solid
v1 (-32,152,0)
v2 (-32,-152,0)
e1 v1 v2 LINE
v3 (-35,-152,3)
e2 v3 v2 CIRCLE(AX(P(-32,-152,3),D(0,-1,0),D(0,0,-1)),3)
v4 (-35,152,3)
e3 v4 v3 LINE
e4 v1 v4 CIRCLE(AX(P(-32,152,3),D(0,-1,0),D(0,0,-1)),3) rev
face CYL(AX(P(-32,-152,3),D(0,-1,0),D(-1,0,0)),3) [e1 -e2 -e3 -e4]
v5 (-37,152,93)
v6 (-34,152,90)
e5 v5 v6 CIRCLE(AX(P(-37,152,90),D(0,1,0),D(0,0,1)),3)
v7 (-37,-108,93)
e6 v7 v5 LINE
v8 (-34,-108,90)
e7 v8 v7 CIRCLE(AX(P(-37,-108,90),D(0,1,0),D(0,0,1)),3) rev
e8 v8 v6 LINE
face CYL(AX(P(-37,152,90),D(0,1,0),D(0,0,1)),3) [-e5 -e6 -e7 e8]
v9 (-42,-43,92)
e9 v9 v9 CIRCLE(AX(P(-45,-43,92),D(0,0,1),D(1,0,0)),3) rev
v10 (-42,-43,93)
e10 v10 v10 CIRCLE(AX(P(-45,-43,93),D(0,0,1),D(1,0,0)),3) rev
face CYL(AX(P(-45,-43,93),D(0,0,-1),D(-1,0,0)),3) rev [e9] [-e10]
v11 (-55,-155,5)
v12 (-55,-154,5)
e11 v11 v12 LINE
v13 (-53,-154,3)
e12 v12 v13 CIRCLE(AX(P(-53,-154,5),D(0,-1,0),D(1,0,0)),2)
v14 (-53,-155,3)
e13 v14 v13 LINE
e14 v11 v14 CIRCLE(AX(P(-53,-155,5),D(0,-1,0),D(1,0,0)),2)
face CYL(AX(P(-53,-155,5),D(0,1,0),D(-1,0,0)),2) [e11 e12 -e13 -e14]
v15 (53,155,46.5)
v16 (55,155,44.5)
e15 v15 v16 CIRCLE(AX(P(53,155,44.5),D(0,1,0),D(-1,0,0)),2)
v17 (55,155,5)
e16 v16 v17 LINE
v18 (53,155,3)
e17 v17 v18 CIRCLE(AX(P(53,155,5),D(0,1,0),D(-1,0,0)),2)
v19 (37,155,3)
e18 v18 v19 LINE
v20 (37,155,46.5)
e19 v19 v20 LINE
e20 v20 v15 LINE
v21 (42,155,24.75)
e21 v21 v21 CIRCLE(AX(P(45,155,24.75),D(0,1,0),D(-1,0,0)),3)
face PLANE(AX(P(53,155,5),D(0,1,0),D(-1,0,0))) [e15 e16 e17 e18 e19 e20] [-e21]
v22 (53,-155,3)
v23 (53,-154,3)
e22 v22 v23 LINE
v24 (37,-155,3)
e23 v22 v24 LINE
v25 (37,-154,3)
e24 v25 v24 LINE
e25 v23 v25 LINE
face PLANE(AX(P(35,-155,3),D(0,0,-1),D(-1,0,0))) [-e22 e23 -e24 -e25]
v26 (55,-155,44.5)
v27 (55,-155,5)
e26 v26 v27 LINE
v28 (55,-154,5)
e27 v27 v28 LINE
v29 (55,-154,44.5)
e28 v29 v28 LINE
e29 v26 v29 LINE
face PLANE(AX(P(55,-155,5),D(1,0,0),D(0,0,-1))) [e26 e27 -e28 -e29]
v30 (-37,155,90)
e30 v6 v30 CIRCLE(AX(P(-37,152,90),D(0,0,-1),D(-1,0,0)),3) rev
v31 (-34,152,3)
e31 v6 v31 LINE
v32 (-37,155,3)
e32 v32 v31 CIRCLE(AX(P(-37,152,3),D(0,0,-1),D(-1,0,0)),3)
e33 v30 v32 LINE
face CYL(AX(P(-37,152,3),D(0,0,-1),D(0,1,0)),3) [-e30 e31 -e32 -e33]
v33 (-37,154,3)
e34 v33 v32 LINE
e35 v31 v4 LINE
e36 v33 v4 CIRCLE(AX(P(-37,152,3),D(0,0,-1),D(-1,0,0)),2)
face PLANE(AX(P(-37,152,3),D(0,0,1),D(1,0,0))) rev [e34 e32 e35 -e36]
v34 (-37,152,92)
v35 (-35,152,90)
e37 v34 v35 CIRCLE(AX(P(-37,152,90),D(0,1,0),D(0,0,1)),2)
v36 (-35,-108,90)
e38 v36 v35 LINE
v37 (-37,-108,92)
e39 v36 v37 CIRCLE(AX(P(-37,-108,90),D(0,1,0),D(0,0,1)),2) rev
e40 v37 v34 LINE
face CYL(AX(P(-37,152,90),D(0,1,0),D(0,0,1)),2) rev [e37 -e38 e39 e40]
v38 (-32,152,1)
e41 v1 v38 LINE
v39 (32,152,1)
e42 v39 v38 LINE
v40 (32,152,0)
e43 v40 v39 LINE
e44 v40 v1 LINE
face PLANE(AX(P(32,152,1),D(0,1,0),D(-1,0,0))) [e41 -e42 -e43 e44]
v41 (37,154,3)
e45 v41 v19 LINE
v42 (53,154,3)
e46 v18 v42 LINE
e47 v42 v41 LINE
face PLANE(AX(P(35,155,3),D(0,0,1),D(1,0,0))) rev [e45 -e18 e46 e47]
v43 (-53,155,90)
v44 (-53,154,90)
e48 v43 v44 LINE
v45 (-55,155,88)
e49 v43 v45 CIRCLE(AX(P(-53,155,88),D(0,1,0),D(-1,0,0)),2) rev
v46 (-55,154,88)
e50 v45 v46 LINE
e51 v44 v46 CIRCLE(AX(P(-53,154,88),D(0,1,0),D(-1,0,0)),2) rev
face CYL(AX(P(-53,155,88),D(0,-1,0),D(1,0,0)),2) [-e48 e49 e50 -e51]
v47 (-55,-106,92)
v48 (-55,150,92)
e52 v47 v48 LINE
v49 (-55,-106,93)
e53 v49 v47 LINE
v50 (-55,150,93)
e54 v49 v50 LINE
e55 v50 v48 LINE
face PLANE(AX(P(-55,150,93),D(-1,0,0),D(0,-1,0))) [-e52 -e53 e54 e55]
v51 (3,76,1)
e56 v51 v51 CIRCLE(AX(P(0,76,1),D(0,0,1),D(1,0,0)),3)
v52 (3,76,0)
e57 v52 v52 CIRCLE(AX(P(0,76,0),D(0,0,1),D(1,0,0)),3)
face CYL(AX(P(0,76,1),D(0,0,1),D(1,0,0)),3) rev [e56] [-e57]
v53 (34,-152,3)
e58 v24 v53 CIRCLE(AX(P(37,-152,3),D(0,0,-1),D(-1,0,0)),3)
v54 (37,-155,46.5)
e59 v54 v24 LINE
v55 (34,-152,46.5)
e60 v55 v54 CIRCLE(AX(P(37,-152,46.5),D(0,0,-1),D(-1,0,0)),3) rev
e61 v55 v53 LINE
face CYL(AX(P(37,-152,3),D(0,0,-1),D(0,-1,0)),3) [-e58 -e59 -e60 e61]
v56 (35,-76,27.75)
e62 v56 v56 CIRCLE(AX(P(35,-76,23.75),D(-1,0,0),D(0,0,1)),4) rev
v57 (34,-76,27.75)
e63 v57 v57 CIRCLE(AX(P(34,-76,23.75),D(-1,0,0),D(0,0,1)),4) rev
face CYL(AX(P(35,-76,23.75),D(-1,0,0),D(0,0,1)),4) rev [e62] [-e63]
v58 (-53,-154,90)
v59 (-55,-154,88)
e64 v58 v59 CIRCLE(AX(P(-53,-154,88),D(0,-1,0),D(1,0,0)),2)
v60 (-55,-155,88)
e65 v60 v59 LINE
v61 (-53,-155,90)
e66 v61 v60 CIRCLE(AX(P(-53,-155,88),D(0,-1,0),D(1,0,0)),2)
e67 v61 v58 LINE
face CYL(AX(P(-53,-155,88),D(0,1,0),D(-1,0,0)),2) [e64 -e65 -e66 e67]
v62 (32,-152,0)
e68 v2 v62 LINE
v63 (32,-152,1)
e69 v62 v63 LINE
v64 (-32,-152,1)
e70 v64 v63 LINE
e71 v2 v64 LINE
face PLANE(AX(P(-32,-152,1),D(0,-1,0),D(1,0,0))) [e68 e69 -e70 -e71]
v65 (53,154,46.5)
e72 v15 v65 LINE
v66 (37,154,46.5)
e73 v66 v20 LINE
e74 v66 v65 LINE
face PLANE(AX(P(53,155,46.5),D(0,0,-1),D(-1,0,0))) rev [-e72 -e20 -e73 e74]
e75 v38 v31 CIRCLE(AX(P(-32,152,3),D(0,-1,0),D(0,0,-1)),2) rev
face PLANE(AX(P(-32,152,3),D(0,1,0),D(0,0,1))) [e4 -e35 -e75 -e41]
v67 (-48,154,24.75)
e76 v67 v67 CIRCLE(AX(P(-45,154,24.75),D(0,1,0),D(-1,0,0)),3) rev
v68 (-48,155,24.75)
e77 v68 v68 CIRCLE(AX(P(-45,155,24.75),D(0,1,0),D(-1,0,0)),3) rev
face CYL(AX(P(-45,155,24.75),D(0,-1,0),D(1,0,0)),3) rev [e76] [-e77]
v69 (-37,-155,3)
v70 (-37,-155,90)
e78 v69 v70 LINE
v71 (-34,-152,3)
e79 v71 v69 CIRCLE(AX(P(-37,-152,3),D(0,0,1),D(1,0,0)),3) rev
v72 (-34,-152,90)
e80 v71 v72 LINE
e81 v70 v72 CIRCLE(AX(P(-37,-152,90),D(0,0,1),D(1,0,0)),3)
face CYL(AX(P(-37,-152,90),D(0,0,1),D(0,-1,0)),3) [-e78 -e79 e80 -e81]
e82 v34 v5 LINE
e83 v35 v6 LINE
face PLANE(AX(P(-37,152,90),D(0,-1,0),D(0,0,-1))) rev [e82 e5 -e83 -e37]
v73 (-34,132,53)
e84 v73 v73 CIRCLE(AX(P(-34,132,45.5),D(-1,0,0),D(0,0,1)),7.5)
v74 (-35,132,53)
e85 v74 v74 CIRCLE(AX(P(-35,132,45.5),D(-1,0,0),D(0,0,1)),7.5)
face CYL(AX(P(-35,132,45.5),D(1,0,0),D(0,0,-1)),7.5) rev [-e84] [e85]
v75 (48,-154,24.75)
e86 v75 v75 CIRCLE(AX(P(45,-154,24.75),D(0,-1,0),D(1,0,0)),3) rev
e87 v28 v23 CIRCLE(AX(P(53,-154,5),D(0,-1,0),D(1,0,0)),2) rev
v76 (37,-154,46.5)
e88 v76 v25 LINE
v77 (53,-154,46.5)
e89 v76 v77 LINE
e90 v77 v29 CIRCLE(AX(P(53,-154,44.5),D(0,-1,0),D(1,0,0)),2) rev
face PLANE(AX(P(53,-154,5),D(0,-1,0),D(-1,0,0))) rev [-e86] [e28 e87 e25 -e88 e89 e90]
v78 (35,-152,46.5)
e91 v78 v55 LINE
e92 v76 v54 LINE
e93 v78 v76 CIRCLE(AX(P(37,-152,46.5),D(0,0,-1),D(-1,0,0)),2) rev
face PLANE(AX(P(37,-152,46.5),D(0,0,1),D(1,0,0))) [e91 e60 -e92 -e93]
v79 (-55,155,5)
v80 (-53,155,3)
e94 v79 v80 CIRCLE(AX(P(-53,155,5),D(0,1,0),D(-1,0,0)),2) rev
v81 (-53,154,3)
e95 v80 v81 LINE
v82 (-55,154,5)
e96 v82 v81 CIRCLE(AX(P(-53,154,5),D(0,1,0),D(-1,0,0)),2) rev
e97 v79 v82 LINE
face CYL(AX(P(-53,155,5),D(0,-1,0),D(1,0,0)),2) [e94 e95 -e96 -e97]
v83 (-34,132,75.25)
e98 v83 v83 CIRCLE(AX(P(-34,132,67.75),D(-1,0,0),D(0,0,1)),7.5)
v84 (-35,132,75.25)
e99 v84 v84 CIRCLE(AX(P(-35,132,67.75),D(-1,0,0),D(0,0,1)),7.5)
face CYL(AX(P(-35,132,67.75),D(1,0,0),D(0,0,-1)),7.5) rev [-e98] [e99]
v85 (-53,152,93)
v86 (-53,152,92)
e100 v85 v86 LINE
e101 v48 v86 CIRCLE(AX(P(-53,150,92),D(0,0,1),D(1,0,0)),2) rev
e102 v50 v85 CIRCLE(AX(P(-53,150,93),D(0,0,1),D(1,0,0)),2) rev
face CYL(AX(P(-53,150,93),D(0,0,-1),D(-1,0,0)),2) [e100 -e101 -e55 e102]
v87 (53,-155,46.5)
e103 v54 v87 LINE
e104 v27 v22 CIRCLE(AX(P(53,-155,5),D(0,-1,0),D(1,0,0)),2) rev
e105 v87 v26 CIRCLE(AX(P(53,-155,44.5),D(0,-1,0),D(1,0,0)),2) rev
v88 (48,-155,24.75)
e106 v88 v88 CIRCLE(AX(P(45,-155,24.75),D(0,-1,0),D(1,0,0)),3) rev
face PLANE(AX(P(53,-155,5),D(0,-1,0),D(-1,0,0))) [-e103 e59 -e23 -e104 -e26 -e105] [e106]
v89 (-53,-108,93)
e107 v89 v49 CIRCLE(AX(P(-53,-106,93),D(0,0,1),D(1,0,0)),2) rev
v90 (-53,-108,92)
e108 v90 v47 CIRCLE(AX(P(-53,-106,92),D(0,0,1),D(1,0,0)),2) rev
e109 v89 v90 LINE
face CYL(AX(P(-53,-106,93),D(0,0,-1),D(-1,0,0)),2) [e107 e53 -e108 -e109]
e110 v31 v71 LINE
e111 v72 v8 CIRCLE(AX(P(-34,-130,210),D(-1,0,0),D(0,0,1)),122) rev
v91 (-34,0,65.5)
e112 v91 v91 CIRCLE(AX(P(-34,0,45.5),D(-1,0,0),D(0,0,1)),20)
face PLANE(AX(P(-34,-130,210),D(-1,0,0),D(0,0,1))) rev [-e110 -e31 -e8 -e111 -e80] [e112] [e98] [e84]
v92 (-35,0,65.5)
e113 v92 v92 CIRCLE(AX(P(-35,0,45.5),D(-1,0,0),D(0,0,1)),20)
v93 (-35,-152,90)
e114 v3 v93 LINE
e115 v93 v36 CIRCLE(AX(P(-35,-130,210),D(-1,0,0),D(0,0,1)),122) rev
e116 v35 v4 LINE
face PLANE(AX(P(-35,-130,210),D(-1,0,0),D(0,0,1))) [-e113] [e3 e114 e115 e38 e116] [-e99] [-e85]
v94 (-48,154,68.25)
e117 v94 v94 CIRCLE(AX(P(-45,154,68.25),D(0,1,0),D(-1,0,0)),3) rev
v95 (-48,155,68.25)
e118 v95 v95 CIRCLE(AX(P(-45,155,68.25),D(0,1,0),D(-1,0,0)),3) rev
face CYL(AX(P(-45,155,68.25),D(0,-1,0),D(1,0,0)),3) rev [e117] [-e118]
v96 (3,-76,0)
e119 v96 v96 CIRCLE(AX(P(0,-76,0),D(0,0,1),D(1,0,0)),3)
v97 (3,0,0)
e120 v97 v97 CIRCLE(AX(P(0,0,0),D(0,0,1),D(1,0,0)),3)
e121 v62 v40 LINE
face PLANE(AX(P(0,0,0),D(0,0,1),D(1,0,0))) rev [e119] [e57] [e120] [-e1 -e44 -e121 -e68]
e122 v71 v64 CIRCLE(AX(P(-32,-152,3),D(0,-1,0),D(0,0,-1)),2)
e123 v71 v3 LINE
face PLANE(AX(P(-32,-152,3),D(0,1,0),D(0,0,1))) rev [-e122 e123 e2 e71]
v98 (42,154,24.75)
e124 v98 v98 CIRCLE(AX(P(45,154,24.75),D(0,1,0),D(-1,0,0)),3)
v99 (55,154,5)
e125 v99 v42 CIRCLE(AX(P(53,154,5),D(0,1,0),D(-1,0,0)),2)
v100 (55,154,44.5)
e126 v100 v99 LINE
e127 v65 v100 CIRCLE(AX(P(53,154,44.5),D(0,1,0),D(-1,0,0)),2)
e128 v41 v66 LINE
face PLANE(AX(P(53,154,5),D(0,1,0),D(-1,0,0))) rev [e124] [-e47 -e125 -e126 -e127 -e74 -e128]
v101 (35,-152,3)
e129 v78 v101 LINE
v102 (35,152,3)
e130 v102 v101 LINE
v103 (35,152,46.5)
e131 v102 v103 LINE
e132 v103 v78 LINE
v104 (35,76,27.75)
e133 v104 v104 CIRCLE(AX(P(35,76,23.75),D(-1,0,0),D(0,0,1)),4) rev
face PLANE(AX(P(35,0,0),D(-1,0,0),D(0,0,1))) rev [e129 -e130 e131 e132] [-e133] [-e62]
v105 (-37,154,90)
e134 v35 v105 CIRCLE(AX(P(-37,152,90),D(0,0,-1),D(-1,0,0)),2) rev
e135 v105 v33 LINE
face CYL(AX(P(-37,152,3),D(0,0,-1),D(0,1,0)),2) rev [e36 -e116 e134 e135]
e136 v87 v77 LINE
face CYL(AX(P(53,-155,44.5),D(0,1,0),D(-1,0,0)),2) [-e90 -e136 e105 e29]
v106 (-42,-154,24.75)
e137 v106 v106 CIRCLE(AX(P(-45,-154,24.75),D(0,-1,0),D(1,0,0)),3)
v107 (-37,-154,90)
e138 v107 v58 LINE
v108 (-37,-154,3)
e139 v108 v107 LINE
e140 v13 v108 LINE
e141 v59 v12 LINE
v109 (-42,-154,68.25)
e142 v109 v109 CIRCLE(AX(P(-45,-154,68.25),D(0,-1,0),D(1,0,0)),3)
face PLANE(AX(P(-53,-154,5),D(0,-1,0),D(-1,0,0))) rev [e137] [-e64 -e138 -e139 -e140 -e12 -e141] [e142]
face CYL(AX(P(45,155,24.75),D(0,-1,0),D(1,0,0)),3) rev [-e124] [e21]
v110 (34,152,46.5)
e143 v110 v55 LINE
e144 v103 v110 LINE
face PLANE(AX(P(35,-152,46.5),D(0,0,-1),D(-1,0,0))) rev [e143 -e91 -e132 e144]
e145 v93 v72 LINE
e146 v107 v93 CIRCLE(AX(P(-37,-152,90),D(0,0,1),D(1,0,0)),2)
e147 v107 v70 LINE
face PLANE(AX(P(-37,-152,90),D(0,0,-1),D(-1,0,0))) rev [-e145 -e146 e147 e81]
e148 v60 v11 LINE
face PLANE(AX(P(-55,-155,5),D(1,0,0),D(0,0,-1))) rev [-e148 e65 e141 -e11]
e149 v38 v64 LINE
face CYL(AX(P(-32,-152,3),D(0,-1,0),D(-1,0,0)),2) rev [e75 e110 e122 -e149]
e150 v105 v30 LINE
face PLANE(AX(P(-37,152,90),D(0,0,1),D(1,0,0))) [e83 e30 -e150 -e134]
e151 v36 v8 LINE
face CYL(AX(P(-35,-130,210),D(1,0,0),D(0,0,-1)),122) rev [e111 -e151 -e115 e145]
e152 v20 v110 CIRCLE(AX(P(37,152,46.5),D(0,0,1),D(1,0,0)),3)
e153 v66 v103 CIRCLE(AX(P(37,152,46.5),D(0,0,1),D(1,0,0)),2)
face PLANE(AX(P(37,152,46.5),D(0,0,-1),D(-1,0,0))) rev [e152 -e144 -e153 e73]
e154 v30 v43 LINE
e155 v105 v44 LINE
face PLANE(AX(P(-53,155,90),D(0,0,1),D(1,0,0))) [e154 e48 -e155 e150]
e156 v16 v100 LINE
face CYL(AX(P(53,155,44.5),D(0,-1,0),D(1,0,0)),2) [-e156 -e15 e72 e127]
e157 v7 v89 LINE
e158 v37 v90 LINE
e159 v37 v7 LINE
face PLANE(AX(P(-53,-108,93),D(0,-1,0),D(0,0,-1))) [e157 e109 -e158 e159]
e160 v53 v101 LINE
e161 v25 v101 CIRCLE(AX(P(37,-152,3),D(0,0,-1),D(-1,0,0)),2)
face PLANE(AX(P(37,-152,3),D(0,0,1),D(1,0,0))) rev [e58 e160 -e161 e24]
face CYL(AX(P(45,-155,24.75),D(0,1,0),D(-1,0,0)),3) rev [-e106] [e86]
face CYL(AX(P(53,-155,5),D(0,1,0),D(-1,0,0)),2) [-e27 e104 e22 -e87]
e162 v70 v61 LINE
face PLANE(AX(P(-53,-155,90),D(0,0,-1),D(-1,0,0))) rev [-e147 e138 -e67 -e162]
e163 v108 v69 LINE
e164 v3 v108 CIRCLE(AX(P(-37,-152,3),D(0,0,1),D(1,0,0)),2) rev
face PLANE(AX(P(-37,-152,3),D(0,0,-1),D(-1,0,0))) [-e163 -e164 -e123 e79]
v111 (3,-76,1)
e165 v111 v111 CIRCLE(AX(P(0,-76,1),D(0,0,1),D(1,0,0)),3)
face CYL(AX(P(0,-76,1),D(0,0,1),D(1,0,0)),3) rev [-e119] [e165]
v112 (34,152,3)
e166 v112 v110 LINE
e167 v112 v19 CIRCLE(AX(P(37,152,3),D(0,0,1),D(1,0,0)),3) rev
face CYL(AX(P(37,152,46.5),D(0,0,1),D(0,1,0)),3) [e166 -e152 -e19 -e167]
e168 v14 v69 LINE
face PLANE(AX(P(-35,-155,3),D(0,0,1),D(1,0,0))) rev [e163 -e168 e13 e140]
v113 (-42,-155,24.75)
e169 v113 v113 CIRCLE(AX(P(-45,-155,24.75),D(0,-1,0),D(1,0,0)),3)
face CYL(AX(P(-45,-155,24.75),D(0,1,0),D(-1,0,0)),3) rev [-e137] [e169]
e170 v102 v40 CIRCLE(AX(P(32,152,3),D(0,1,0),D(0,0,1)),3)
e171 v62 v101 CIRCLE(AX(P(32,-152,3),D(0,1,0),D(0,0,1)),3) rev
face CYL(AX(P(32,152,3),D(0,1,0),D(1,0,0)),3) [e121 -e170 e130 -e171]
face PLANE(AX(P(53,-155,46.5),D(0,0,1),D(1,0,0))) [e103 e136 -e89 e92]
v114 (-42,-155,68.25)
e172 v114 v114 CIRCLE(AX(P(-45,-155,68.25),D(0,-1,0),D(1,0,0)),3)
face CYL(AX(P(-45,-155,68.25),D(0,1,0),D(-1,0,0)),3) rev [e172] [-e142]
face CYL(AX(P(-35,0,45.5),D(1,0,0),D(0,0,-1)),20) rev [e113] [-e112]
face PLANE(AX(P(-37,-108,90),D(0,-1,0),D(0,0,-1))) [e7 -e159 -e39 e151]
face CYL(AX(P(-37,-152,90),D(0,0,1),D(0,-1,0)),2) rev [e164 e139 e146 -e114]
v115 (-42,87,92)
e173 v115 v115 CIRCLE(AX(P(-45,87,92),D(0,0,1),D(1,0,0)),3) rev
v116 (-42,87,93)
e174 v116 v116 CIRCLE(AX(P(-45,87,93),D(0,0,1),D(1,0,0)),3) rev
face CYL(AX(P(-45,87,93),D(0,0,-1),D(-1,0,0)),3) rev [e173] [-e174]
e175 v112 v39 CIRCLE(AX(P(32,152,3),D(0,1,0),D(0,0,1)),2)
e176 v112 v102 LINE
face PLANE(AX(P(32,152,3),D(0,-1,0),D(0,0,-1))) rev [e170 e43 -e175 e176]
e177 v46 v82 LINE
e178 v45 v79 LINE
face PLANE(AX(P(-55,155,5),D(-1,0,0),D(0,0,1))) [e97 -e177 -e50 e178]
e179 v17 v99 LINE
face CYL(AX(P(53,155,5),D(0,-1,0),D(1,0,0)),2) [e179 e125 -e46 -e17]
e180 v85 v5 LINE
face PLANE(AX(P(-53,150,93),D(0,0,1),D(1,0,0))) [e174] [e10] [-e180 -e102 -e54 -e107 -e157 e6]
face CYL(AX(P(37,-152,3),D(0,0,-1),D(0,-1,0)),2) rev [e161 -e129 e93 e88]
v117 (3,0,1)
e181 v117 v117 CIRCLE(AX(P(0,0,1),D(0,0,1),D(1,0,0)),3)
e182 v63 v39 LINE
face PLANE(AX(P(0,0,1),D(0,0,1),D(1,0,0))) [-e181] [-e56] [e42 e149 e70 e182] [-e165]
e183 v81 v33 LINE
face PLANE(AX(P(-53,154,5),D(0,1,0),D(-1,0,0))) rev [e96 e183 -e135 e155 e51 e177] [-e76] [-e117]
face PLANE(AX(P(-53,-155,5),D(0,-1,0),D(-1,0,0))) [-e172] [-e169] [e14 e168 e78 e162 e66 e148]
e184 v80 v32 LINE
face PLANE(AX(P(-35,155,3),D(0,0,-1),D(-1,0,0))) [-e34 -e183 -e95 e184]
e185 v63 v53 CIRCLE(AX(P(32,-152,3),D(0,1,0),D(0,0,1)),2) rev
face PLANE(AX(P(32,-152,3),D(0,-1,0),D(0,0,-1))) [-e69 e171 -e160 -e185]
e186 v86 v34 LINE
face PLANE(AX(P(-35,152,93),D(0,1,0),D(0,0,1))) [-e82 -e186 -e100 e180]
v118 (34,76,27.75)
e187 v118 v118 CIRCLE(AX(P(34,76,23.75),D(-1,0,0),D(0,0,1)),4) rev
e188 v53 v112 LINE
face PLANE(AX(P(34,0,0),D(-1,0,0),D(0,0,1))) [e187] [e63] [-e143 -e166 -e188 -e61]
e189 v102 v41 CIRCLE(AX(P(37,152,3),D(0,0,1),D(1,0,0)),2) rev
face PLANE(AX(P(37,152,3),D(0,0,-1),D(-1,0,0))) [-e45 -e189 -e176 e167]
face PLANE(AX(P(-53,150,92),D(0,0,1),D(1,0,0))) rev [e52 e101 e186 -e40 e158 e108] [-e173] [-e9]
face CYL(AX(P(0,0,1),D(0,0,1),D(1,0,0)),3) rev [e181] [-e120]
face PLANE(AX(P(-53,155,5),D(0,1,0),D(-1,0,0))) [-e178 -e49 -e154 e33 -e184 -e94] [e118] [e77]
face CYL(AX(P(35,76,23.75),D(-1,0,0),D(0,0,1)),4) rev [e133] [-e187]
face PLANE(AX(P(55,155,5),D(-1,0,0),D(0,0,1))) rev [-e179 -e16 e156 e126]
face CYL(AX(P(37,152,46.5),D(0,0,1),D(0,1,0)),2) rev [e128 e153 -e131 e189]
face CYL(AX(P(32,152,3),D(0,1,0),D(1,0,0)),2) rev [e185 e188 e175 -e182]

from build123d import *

# Parameters (mm, degrees)
SKETCH1_W                = 64
SKETCH1_H                = 304
SKETCH1_R                = 3
BOSS_EXTRUDE1_DEPTH      = 1
EDGE_FLANGE1_DEPTH       = 304
EDGE_FLANGE1_START       = 1
EDGE_FLANGE1_PROFILE_R   = 7.5
EDGE_FLANGE1_PROFILE_R_2 = 20
EDGE_FLANGE1_FLAT_DEPTH  = 1
EDGE_FLANGE2_DEPTH       = 260
EDGE_FLANGE2_START       = -1
EDGE_FLANGE2_PROFILE_R   = 3
EDGE_FLANGE2_FLAT_DEPTH  = 1
EDGE_FLANGE3_DEPTH       = 87
EDGE_FLANGE3_START       = -1
EDGE_FLANGE3_PROFILE_R   = 3
EDGE_FLANGE3_FLAT_DEPTH  = 1
EDGE_FLANGE4_DEPTH       = 304
EDGE_FLANGE4_START       = 1
EDGE_FLANGE4_PROFILE_W   = 304
EDGE_FLANGE4_PROFILE_H   = 43.5
EDGE_FLANGE4_PROFILE_R   = 4
EDGE_FLANGE4_FLAT_DEPTH  = 1
EDGE_FLANGE5_DEPTH       = 43.5
EDGE_FLANGE5_START       = 1
EDGE_FLANGE5_PROFILE_R   = 3
EDGE_FLANGE5_FLAT_DEPTH  = 1


# Sheet-metal steps are written as plain solids
with BuildPart() as part:
    # Sketch1 → Boss-Extrude1 (new body)
    with BuildSketch(Plane.XY):
        Rectangle(SKETCH1_W, SKETCH1_H)
        Circle(SKETCH1_R, mode=Mode.SUBTRACT)
        with Locations((0, 76)):
            Circle(SKETCH1_R, mode=Mode.SUBTRACT)
        with Locations((0, -76)):
            Circle(SKETCH1_R, mode=Mode.SUBTRACT)
    extrude(amount=BOSS_EXTRUDE1_DEPTH)

    # Edge-Flange1 bend section (across the edge) → Edge-Flange1 (add)
    with BuildSketch(Plane(origin=(-34, 152, 1), x_dir=(1, 0, 0), z_dir=(0, -1, 0))):
        with BuildLine():
            Line((-1, 2), (0, 2))
            ThreePointArc((0, 2), (0.585786438, 0.585786438), (2, 0))
            Line((2, 0), (2, -1))
            ThreePointArc((2, -1), (-0.121320344, -0.121320344), (-1, 2))
        make_face()
    extrude(amount=EDGE_FLANGE1_DEPTH)

    # Edge-Flange1 profile (on flange) → Edge-Flange1 flat (add)
    with BuildSketch(Plane(origin=(-34, 0, 1), x_dir=(0, -1, 0), z_dir=(-1, 0, 0)).offset(EDGE_FLANGE1_START)):
        with BuildLine():
            ThreePointArc((152, 89), (130, 87), (108, 89))
            Line((108, 89), (-152, 89))
            Line((-152, 89), (-152, 2))
            Line((-152, 2), (152, 2))
            Line((152, 2), (152, 89))
        make_face()
        with Locations((-132, 44.5)):
            Circle(EDGE_FLANGE1_PROFILE_R, mode=Mode.SUBTRACT)
        with Locations((0, 44.5)):
            Circle(EDGE_FLANGE1_PROFILE_R_2, mode=Mode.SUBTRACT)
        with Locations((-132, 66.75)):
            Circle(EDGE_FLANGE1_PROFILE_R, mode=Mode.SUBTRACT)
    extrude(amount=-EDGE_FLANGE1_FLAT_DEPTH)

    # Edge-Flange2 bend section (across the edge) → Edge-Flange2 (add)
    with BuildSketch(Plane(origin=(-35, -108, 92), x_dir=(0, 0, -1), z_dir=(0, 1, 0))):
        with BuildLine():
            Line((-1, 2), (0, 2))
            ThreePointArc((0, 2), (0.585786438, 0.585786438), (2, 0))
            Line((2, 0), (2, -1))
            ThreePointArc((2, -1), (-0.121320344, -0.121320344), (-1, 2))
        make_face()
    extrude(amount=EDGE_FLANGE2_DEPTH)

    # Edge-Flange2 profile (on flange) → Edge-Flange2 flat (add)
    with BuildSketch(Plane(origin=(-35, 0, 92), x_dir=(0, -1, 0), z_dir=(0, 0, -1)).offset(EDGE_FLANGE2_START)):
        with BuildLine():
            Line((-152, 2), (108, 2))
            Line((108, 2), (108, 18))
            ThreePointArc((108, 18), (107.414213562, 19.414213562), (106, 20))
            Line((106, 20), (-150, 20))
            ThreePointArc((-150, 20), (-151.414213562, 19.414213562), (-152, 18))
            Line((-152, 18), (-152, 2))
        make_face()
        with Locations((43, 10)):
            Circle(EDGE_FLANGE2_PROFILE_R, mode=Mode.SUBTRACT)
        with Locations((-87, 10)):
            Circle(EDGE_FLANGE2_PROFILE_R, mode=Mode.SUBTRACT)
    extrude(amount=EDGE_FLANGE2_FLAT_DEPTH)

    # Edge-Flange3 bend section (across the edge) → Edge-Flange3 (add)
    with BuildSketch(Plane(origin=(-35, 154, 90), x_dir=(0, -1, 0), z_dir=(0, 0, -1))):
        with BuildLine():
            Line((-1, 2), (0, 2))
            ThreePointArc((0, 2), (0.585786438, 0.585786438), (2, 0))
            Line((2, 0), (2, -1))
            ThreePointArc((2, -1), (-0.121320344, -0.121320344), (-1, 2))
        make_face()
    edge_flange3 = extrude(amount=EDGE_FLANGE3_DEPTH)

    # Edge-Flange3 profile (on flange) → Edge-Flange3 flat (add)
    with BuildSketch(Plane(origin=(-35, 154, 0), x_dir=(0, 0, 1), z_dir=(0, -1, 0)).offset(EDGE_FLANGE3_START)):
        with BuildLine():
            Line((3, 2), (90, 2))
            Line((90, 2), (90, 18))
            ThreePointArc((90, 18), (89.414213562, 19.414213562), (88, 20))
            Line((88, 20), (5, 20))
            ThreePointArc((5, 20), (3.585786438, 19.414213562), (3, 18))
            Line((3, 18), (3, 2))
        make_face()
        with Locations((24.75, 10)):
            Circle(EDGE_FLANGE3_PROFILE_R, mode=Mode.SUBTRACT)
        with Locations((68.25, 10)):
            Circle(EDGE_FLANGE3_PROFILE_R, mode=Mode.SUBTRACT)
    edge_flange3_flat = extrude(amount=EDGE_FLANGE3_FLAT_DEPTH)

    # Mirror1: Edge-Flange3, Edge-Flange3 flat across plane
    add(edge_flange3.mirror(Plane.ZX))
    add(edge_flange3_flat.mirror(Plane.ZX))

    # Edge-Flange4 bend section (across the edge) → Edge-Flange4 (add)
    with BuildSketch(Plane(origin=(34, -152, 1), x_dir=(-1, 0, 0), z_dir=(0, 1, 0))):
        with BuildLine():
            Line((-1, 2), (0, 2))
            ThreePointArc((0, 2), (0.585786438, 0.585786438), (2, 0))
            Line((2, 0), (2, -1))
            ThreePointArc((2, -1), (-0.121320344, -0.121320344), (-1, 2))
        make_face()
    extrude(amount=EDGE_FLANGE4_DEPTH)

    # Edge-Flange4 profile (on flange) → Edge-Flange4 flat (add)
    with BuildSketch(Plane(origin=(34, 0, 1), x_dir=(0, 1, 0), z_dir=(1, 0, 0)).offset(EDGE_FLANGE4_START)):
        with Locations((0, 23.75)):
            Rectangle(EDGE_FLANGE4_PROFILE_W, EDGE_FLANGE4_PROFILE_H)
        with Locations((-76, 22.75)):
            Circle(EDGE_FLANGE4_PROFILE_R, mode=Mode.SUBTRACT)
        with Locations((76, 22.75)):
            Circle(EDGE_FLANGE4_PROFILE_R, mode=Mode.SUBTRACT)
    extrude(amount=-EDGE_FLANGE4_FLAT_DEPTH)

    # Edge-Flange5 bend section (across the edge) → Edge-Flange5 (add)
    with BuildSketch(Plane(origin=(35, 154, 3), x_dir=(0, -1, 0), z_dir=(0, 0, 1))):
        with BuildLine():
            Line((-1, 2), (0, 2))
            ThreePointArc((0, 2), (0.585786438, 0.585786438), (2, 0))
            Line((2, 0), (2, -1))
            ThreePointArc((2, -1), (-0.121320344, -0.121320344), (-1, 2))
        make_face()
    edge_flange5 = extrude(amount=EDGE_FLANGE5_DEPTH)

    # Edge-Flange5 profile (on flange) → Edge-Flange5 flat (add)
    with BuildSketch(Plane(origin=(35, 154, 0), x_dir=(0, 0, 1), z_dir=(0, 1, 0)).offset(EDGE_FLANGE5_START)):
        with BuildLine():
            ThreePointArc((5, 20), (3.585786438, 19.414213562), (3, 18))
            Line((3, 18), (3, 2))
            Line((3, 2), (46.5, 2))
            Line((46.5, 2), (46.5, 18))
            ThreePointArc((46.5, 18), (45.914213562, 19.414213562), (44.5, 20))
            Line((44.5, 20), (5, 20))
        make_face()
        with Locations((24.75, 10)):
            Circle(EDGE_FLANGE5_PROFILE_R, mode=Mode.SUBTRACT)
    edge_flange5_flat = extrude(amount=-EDGE_FLANGE5_FLAT_DEPTH)

    # Mirror2: Edge-Flange5, Edge-Flange5 flat across plane
    add(edge_flange5.mirror(Plane.ZX))
    add(edge_flange5_flat.mirror(Plane.ZX))


solid = part.part
